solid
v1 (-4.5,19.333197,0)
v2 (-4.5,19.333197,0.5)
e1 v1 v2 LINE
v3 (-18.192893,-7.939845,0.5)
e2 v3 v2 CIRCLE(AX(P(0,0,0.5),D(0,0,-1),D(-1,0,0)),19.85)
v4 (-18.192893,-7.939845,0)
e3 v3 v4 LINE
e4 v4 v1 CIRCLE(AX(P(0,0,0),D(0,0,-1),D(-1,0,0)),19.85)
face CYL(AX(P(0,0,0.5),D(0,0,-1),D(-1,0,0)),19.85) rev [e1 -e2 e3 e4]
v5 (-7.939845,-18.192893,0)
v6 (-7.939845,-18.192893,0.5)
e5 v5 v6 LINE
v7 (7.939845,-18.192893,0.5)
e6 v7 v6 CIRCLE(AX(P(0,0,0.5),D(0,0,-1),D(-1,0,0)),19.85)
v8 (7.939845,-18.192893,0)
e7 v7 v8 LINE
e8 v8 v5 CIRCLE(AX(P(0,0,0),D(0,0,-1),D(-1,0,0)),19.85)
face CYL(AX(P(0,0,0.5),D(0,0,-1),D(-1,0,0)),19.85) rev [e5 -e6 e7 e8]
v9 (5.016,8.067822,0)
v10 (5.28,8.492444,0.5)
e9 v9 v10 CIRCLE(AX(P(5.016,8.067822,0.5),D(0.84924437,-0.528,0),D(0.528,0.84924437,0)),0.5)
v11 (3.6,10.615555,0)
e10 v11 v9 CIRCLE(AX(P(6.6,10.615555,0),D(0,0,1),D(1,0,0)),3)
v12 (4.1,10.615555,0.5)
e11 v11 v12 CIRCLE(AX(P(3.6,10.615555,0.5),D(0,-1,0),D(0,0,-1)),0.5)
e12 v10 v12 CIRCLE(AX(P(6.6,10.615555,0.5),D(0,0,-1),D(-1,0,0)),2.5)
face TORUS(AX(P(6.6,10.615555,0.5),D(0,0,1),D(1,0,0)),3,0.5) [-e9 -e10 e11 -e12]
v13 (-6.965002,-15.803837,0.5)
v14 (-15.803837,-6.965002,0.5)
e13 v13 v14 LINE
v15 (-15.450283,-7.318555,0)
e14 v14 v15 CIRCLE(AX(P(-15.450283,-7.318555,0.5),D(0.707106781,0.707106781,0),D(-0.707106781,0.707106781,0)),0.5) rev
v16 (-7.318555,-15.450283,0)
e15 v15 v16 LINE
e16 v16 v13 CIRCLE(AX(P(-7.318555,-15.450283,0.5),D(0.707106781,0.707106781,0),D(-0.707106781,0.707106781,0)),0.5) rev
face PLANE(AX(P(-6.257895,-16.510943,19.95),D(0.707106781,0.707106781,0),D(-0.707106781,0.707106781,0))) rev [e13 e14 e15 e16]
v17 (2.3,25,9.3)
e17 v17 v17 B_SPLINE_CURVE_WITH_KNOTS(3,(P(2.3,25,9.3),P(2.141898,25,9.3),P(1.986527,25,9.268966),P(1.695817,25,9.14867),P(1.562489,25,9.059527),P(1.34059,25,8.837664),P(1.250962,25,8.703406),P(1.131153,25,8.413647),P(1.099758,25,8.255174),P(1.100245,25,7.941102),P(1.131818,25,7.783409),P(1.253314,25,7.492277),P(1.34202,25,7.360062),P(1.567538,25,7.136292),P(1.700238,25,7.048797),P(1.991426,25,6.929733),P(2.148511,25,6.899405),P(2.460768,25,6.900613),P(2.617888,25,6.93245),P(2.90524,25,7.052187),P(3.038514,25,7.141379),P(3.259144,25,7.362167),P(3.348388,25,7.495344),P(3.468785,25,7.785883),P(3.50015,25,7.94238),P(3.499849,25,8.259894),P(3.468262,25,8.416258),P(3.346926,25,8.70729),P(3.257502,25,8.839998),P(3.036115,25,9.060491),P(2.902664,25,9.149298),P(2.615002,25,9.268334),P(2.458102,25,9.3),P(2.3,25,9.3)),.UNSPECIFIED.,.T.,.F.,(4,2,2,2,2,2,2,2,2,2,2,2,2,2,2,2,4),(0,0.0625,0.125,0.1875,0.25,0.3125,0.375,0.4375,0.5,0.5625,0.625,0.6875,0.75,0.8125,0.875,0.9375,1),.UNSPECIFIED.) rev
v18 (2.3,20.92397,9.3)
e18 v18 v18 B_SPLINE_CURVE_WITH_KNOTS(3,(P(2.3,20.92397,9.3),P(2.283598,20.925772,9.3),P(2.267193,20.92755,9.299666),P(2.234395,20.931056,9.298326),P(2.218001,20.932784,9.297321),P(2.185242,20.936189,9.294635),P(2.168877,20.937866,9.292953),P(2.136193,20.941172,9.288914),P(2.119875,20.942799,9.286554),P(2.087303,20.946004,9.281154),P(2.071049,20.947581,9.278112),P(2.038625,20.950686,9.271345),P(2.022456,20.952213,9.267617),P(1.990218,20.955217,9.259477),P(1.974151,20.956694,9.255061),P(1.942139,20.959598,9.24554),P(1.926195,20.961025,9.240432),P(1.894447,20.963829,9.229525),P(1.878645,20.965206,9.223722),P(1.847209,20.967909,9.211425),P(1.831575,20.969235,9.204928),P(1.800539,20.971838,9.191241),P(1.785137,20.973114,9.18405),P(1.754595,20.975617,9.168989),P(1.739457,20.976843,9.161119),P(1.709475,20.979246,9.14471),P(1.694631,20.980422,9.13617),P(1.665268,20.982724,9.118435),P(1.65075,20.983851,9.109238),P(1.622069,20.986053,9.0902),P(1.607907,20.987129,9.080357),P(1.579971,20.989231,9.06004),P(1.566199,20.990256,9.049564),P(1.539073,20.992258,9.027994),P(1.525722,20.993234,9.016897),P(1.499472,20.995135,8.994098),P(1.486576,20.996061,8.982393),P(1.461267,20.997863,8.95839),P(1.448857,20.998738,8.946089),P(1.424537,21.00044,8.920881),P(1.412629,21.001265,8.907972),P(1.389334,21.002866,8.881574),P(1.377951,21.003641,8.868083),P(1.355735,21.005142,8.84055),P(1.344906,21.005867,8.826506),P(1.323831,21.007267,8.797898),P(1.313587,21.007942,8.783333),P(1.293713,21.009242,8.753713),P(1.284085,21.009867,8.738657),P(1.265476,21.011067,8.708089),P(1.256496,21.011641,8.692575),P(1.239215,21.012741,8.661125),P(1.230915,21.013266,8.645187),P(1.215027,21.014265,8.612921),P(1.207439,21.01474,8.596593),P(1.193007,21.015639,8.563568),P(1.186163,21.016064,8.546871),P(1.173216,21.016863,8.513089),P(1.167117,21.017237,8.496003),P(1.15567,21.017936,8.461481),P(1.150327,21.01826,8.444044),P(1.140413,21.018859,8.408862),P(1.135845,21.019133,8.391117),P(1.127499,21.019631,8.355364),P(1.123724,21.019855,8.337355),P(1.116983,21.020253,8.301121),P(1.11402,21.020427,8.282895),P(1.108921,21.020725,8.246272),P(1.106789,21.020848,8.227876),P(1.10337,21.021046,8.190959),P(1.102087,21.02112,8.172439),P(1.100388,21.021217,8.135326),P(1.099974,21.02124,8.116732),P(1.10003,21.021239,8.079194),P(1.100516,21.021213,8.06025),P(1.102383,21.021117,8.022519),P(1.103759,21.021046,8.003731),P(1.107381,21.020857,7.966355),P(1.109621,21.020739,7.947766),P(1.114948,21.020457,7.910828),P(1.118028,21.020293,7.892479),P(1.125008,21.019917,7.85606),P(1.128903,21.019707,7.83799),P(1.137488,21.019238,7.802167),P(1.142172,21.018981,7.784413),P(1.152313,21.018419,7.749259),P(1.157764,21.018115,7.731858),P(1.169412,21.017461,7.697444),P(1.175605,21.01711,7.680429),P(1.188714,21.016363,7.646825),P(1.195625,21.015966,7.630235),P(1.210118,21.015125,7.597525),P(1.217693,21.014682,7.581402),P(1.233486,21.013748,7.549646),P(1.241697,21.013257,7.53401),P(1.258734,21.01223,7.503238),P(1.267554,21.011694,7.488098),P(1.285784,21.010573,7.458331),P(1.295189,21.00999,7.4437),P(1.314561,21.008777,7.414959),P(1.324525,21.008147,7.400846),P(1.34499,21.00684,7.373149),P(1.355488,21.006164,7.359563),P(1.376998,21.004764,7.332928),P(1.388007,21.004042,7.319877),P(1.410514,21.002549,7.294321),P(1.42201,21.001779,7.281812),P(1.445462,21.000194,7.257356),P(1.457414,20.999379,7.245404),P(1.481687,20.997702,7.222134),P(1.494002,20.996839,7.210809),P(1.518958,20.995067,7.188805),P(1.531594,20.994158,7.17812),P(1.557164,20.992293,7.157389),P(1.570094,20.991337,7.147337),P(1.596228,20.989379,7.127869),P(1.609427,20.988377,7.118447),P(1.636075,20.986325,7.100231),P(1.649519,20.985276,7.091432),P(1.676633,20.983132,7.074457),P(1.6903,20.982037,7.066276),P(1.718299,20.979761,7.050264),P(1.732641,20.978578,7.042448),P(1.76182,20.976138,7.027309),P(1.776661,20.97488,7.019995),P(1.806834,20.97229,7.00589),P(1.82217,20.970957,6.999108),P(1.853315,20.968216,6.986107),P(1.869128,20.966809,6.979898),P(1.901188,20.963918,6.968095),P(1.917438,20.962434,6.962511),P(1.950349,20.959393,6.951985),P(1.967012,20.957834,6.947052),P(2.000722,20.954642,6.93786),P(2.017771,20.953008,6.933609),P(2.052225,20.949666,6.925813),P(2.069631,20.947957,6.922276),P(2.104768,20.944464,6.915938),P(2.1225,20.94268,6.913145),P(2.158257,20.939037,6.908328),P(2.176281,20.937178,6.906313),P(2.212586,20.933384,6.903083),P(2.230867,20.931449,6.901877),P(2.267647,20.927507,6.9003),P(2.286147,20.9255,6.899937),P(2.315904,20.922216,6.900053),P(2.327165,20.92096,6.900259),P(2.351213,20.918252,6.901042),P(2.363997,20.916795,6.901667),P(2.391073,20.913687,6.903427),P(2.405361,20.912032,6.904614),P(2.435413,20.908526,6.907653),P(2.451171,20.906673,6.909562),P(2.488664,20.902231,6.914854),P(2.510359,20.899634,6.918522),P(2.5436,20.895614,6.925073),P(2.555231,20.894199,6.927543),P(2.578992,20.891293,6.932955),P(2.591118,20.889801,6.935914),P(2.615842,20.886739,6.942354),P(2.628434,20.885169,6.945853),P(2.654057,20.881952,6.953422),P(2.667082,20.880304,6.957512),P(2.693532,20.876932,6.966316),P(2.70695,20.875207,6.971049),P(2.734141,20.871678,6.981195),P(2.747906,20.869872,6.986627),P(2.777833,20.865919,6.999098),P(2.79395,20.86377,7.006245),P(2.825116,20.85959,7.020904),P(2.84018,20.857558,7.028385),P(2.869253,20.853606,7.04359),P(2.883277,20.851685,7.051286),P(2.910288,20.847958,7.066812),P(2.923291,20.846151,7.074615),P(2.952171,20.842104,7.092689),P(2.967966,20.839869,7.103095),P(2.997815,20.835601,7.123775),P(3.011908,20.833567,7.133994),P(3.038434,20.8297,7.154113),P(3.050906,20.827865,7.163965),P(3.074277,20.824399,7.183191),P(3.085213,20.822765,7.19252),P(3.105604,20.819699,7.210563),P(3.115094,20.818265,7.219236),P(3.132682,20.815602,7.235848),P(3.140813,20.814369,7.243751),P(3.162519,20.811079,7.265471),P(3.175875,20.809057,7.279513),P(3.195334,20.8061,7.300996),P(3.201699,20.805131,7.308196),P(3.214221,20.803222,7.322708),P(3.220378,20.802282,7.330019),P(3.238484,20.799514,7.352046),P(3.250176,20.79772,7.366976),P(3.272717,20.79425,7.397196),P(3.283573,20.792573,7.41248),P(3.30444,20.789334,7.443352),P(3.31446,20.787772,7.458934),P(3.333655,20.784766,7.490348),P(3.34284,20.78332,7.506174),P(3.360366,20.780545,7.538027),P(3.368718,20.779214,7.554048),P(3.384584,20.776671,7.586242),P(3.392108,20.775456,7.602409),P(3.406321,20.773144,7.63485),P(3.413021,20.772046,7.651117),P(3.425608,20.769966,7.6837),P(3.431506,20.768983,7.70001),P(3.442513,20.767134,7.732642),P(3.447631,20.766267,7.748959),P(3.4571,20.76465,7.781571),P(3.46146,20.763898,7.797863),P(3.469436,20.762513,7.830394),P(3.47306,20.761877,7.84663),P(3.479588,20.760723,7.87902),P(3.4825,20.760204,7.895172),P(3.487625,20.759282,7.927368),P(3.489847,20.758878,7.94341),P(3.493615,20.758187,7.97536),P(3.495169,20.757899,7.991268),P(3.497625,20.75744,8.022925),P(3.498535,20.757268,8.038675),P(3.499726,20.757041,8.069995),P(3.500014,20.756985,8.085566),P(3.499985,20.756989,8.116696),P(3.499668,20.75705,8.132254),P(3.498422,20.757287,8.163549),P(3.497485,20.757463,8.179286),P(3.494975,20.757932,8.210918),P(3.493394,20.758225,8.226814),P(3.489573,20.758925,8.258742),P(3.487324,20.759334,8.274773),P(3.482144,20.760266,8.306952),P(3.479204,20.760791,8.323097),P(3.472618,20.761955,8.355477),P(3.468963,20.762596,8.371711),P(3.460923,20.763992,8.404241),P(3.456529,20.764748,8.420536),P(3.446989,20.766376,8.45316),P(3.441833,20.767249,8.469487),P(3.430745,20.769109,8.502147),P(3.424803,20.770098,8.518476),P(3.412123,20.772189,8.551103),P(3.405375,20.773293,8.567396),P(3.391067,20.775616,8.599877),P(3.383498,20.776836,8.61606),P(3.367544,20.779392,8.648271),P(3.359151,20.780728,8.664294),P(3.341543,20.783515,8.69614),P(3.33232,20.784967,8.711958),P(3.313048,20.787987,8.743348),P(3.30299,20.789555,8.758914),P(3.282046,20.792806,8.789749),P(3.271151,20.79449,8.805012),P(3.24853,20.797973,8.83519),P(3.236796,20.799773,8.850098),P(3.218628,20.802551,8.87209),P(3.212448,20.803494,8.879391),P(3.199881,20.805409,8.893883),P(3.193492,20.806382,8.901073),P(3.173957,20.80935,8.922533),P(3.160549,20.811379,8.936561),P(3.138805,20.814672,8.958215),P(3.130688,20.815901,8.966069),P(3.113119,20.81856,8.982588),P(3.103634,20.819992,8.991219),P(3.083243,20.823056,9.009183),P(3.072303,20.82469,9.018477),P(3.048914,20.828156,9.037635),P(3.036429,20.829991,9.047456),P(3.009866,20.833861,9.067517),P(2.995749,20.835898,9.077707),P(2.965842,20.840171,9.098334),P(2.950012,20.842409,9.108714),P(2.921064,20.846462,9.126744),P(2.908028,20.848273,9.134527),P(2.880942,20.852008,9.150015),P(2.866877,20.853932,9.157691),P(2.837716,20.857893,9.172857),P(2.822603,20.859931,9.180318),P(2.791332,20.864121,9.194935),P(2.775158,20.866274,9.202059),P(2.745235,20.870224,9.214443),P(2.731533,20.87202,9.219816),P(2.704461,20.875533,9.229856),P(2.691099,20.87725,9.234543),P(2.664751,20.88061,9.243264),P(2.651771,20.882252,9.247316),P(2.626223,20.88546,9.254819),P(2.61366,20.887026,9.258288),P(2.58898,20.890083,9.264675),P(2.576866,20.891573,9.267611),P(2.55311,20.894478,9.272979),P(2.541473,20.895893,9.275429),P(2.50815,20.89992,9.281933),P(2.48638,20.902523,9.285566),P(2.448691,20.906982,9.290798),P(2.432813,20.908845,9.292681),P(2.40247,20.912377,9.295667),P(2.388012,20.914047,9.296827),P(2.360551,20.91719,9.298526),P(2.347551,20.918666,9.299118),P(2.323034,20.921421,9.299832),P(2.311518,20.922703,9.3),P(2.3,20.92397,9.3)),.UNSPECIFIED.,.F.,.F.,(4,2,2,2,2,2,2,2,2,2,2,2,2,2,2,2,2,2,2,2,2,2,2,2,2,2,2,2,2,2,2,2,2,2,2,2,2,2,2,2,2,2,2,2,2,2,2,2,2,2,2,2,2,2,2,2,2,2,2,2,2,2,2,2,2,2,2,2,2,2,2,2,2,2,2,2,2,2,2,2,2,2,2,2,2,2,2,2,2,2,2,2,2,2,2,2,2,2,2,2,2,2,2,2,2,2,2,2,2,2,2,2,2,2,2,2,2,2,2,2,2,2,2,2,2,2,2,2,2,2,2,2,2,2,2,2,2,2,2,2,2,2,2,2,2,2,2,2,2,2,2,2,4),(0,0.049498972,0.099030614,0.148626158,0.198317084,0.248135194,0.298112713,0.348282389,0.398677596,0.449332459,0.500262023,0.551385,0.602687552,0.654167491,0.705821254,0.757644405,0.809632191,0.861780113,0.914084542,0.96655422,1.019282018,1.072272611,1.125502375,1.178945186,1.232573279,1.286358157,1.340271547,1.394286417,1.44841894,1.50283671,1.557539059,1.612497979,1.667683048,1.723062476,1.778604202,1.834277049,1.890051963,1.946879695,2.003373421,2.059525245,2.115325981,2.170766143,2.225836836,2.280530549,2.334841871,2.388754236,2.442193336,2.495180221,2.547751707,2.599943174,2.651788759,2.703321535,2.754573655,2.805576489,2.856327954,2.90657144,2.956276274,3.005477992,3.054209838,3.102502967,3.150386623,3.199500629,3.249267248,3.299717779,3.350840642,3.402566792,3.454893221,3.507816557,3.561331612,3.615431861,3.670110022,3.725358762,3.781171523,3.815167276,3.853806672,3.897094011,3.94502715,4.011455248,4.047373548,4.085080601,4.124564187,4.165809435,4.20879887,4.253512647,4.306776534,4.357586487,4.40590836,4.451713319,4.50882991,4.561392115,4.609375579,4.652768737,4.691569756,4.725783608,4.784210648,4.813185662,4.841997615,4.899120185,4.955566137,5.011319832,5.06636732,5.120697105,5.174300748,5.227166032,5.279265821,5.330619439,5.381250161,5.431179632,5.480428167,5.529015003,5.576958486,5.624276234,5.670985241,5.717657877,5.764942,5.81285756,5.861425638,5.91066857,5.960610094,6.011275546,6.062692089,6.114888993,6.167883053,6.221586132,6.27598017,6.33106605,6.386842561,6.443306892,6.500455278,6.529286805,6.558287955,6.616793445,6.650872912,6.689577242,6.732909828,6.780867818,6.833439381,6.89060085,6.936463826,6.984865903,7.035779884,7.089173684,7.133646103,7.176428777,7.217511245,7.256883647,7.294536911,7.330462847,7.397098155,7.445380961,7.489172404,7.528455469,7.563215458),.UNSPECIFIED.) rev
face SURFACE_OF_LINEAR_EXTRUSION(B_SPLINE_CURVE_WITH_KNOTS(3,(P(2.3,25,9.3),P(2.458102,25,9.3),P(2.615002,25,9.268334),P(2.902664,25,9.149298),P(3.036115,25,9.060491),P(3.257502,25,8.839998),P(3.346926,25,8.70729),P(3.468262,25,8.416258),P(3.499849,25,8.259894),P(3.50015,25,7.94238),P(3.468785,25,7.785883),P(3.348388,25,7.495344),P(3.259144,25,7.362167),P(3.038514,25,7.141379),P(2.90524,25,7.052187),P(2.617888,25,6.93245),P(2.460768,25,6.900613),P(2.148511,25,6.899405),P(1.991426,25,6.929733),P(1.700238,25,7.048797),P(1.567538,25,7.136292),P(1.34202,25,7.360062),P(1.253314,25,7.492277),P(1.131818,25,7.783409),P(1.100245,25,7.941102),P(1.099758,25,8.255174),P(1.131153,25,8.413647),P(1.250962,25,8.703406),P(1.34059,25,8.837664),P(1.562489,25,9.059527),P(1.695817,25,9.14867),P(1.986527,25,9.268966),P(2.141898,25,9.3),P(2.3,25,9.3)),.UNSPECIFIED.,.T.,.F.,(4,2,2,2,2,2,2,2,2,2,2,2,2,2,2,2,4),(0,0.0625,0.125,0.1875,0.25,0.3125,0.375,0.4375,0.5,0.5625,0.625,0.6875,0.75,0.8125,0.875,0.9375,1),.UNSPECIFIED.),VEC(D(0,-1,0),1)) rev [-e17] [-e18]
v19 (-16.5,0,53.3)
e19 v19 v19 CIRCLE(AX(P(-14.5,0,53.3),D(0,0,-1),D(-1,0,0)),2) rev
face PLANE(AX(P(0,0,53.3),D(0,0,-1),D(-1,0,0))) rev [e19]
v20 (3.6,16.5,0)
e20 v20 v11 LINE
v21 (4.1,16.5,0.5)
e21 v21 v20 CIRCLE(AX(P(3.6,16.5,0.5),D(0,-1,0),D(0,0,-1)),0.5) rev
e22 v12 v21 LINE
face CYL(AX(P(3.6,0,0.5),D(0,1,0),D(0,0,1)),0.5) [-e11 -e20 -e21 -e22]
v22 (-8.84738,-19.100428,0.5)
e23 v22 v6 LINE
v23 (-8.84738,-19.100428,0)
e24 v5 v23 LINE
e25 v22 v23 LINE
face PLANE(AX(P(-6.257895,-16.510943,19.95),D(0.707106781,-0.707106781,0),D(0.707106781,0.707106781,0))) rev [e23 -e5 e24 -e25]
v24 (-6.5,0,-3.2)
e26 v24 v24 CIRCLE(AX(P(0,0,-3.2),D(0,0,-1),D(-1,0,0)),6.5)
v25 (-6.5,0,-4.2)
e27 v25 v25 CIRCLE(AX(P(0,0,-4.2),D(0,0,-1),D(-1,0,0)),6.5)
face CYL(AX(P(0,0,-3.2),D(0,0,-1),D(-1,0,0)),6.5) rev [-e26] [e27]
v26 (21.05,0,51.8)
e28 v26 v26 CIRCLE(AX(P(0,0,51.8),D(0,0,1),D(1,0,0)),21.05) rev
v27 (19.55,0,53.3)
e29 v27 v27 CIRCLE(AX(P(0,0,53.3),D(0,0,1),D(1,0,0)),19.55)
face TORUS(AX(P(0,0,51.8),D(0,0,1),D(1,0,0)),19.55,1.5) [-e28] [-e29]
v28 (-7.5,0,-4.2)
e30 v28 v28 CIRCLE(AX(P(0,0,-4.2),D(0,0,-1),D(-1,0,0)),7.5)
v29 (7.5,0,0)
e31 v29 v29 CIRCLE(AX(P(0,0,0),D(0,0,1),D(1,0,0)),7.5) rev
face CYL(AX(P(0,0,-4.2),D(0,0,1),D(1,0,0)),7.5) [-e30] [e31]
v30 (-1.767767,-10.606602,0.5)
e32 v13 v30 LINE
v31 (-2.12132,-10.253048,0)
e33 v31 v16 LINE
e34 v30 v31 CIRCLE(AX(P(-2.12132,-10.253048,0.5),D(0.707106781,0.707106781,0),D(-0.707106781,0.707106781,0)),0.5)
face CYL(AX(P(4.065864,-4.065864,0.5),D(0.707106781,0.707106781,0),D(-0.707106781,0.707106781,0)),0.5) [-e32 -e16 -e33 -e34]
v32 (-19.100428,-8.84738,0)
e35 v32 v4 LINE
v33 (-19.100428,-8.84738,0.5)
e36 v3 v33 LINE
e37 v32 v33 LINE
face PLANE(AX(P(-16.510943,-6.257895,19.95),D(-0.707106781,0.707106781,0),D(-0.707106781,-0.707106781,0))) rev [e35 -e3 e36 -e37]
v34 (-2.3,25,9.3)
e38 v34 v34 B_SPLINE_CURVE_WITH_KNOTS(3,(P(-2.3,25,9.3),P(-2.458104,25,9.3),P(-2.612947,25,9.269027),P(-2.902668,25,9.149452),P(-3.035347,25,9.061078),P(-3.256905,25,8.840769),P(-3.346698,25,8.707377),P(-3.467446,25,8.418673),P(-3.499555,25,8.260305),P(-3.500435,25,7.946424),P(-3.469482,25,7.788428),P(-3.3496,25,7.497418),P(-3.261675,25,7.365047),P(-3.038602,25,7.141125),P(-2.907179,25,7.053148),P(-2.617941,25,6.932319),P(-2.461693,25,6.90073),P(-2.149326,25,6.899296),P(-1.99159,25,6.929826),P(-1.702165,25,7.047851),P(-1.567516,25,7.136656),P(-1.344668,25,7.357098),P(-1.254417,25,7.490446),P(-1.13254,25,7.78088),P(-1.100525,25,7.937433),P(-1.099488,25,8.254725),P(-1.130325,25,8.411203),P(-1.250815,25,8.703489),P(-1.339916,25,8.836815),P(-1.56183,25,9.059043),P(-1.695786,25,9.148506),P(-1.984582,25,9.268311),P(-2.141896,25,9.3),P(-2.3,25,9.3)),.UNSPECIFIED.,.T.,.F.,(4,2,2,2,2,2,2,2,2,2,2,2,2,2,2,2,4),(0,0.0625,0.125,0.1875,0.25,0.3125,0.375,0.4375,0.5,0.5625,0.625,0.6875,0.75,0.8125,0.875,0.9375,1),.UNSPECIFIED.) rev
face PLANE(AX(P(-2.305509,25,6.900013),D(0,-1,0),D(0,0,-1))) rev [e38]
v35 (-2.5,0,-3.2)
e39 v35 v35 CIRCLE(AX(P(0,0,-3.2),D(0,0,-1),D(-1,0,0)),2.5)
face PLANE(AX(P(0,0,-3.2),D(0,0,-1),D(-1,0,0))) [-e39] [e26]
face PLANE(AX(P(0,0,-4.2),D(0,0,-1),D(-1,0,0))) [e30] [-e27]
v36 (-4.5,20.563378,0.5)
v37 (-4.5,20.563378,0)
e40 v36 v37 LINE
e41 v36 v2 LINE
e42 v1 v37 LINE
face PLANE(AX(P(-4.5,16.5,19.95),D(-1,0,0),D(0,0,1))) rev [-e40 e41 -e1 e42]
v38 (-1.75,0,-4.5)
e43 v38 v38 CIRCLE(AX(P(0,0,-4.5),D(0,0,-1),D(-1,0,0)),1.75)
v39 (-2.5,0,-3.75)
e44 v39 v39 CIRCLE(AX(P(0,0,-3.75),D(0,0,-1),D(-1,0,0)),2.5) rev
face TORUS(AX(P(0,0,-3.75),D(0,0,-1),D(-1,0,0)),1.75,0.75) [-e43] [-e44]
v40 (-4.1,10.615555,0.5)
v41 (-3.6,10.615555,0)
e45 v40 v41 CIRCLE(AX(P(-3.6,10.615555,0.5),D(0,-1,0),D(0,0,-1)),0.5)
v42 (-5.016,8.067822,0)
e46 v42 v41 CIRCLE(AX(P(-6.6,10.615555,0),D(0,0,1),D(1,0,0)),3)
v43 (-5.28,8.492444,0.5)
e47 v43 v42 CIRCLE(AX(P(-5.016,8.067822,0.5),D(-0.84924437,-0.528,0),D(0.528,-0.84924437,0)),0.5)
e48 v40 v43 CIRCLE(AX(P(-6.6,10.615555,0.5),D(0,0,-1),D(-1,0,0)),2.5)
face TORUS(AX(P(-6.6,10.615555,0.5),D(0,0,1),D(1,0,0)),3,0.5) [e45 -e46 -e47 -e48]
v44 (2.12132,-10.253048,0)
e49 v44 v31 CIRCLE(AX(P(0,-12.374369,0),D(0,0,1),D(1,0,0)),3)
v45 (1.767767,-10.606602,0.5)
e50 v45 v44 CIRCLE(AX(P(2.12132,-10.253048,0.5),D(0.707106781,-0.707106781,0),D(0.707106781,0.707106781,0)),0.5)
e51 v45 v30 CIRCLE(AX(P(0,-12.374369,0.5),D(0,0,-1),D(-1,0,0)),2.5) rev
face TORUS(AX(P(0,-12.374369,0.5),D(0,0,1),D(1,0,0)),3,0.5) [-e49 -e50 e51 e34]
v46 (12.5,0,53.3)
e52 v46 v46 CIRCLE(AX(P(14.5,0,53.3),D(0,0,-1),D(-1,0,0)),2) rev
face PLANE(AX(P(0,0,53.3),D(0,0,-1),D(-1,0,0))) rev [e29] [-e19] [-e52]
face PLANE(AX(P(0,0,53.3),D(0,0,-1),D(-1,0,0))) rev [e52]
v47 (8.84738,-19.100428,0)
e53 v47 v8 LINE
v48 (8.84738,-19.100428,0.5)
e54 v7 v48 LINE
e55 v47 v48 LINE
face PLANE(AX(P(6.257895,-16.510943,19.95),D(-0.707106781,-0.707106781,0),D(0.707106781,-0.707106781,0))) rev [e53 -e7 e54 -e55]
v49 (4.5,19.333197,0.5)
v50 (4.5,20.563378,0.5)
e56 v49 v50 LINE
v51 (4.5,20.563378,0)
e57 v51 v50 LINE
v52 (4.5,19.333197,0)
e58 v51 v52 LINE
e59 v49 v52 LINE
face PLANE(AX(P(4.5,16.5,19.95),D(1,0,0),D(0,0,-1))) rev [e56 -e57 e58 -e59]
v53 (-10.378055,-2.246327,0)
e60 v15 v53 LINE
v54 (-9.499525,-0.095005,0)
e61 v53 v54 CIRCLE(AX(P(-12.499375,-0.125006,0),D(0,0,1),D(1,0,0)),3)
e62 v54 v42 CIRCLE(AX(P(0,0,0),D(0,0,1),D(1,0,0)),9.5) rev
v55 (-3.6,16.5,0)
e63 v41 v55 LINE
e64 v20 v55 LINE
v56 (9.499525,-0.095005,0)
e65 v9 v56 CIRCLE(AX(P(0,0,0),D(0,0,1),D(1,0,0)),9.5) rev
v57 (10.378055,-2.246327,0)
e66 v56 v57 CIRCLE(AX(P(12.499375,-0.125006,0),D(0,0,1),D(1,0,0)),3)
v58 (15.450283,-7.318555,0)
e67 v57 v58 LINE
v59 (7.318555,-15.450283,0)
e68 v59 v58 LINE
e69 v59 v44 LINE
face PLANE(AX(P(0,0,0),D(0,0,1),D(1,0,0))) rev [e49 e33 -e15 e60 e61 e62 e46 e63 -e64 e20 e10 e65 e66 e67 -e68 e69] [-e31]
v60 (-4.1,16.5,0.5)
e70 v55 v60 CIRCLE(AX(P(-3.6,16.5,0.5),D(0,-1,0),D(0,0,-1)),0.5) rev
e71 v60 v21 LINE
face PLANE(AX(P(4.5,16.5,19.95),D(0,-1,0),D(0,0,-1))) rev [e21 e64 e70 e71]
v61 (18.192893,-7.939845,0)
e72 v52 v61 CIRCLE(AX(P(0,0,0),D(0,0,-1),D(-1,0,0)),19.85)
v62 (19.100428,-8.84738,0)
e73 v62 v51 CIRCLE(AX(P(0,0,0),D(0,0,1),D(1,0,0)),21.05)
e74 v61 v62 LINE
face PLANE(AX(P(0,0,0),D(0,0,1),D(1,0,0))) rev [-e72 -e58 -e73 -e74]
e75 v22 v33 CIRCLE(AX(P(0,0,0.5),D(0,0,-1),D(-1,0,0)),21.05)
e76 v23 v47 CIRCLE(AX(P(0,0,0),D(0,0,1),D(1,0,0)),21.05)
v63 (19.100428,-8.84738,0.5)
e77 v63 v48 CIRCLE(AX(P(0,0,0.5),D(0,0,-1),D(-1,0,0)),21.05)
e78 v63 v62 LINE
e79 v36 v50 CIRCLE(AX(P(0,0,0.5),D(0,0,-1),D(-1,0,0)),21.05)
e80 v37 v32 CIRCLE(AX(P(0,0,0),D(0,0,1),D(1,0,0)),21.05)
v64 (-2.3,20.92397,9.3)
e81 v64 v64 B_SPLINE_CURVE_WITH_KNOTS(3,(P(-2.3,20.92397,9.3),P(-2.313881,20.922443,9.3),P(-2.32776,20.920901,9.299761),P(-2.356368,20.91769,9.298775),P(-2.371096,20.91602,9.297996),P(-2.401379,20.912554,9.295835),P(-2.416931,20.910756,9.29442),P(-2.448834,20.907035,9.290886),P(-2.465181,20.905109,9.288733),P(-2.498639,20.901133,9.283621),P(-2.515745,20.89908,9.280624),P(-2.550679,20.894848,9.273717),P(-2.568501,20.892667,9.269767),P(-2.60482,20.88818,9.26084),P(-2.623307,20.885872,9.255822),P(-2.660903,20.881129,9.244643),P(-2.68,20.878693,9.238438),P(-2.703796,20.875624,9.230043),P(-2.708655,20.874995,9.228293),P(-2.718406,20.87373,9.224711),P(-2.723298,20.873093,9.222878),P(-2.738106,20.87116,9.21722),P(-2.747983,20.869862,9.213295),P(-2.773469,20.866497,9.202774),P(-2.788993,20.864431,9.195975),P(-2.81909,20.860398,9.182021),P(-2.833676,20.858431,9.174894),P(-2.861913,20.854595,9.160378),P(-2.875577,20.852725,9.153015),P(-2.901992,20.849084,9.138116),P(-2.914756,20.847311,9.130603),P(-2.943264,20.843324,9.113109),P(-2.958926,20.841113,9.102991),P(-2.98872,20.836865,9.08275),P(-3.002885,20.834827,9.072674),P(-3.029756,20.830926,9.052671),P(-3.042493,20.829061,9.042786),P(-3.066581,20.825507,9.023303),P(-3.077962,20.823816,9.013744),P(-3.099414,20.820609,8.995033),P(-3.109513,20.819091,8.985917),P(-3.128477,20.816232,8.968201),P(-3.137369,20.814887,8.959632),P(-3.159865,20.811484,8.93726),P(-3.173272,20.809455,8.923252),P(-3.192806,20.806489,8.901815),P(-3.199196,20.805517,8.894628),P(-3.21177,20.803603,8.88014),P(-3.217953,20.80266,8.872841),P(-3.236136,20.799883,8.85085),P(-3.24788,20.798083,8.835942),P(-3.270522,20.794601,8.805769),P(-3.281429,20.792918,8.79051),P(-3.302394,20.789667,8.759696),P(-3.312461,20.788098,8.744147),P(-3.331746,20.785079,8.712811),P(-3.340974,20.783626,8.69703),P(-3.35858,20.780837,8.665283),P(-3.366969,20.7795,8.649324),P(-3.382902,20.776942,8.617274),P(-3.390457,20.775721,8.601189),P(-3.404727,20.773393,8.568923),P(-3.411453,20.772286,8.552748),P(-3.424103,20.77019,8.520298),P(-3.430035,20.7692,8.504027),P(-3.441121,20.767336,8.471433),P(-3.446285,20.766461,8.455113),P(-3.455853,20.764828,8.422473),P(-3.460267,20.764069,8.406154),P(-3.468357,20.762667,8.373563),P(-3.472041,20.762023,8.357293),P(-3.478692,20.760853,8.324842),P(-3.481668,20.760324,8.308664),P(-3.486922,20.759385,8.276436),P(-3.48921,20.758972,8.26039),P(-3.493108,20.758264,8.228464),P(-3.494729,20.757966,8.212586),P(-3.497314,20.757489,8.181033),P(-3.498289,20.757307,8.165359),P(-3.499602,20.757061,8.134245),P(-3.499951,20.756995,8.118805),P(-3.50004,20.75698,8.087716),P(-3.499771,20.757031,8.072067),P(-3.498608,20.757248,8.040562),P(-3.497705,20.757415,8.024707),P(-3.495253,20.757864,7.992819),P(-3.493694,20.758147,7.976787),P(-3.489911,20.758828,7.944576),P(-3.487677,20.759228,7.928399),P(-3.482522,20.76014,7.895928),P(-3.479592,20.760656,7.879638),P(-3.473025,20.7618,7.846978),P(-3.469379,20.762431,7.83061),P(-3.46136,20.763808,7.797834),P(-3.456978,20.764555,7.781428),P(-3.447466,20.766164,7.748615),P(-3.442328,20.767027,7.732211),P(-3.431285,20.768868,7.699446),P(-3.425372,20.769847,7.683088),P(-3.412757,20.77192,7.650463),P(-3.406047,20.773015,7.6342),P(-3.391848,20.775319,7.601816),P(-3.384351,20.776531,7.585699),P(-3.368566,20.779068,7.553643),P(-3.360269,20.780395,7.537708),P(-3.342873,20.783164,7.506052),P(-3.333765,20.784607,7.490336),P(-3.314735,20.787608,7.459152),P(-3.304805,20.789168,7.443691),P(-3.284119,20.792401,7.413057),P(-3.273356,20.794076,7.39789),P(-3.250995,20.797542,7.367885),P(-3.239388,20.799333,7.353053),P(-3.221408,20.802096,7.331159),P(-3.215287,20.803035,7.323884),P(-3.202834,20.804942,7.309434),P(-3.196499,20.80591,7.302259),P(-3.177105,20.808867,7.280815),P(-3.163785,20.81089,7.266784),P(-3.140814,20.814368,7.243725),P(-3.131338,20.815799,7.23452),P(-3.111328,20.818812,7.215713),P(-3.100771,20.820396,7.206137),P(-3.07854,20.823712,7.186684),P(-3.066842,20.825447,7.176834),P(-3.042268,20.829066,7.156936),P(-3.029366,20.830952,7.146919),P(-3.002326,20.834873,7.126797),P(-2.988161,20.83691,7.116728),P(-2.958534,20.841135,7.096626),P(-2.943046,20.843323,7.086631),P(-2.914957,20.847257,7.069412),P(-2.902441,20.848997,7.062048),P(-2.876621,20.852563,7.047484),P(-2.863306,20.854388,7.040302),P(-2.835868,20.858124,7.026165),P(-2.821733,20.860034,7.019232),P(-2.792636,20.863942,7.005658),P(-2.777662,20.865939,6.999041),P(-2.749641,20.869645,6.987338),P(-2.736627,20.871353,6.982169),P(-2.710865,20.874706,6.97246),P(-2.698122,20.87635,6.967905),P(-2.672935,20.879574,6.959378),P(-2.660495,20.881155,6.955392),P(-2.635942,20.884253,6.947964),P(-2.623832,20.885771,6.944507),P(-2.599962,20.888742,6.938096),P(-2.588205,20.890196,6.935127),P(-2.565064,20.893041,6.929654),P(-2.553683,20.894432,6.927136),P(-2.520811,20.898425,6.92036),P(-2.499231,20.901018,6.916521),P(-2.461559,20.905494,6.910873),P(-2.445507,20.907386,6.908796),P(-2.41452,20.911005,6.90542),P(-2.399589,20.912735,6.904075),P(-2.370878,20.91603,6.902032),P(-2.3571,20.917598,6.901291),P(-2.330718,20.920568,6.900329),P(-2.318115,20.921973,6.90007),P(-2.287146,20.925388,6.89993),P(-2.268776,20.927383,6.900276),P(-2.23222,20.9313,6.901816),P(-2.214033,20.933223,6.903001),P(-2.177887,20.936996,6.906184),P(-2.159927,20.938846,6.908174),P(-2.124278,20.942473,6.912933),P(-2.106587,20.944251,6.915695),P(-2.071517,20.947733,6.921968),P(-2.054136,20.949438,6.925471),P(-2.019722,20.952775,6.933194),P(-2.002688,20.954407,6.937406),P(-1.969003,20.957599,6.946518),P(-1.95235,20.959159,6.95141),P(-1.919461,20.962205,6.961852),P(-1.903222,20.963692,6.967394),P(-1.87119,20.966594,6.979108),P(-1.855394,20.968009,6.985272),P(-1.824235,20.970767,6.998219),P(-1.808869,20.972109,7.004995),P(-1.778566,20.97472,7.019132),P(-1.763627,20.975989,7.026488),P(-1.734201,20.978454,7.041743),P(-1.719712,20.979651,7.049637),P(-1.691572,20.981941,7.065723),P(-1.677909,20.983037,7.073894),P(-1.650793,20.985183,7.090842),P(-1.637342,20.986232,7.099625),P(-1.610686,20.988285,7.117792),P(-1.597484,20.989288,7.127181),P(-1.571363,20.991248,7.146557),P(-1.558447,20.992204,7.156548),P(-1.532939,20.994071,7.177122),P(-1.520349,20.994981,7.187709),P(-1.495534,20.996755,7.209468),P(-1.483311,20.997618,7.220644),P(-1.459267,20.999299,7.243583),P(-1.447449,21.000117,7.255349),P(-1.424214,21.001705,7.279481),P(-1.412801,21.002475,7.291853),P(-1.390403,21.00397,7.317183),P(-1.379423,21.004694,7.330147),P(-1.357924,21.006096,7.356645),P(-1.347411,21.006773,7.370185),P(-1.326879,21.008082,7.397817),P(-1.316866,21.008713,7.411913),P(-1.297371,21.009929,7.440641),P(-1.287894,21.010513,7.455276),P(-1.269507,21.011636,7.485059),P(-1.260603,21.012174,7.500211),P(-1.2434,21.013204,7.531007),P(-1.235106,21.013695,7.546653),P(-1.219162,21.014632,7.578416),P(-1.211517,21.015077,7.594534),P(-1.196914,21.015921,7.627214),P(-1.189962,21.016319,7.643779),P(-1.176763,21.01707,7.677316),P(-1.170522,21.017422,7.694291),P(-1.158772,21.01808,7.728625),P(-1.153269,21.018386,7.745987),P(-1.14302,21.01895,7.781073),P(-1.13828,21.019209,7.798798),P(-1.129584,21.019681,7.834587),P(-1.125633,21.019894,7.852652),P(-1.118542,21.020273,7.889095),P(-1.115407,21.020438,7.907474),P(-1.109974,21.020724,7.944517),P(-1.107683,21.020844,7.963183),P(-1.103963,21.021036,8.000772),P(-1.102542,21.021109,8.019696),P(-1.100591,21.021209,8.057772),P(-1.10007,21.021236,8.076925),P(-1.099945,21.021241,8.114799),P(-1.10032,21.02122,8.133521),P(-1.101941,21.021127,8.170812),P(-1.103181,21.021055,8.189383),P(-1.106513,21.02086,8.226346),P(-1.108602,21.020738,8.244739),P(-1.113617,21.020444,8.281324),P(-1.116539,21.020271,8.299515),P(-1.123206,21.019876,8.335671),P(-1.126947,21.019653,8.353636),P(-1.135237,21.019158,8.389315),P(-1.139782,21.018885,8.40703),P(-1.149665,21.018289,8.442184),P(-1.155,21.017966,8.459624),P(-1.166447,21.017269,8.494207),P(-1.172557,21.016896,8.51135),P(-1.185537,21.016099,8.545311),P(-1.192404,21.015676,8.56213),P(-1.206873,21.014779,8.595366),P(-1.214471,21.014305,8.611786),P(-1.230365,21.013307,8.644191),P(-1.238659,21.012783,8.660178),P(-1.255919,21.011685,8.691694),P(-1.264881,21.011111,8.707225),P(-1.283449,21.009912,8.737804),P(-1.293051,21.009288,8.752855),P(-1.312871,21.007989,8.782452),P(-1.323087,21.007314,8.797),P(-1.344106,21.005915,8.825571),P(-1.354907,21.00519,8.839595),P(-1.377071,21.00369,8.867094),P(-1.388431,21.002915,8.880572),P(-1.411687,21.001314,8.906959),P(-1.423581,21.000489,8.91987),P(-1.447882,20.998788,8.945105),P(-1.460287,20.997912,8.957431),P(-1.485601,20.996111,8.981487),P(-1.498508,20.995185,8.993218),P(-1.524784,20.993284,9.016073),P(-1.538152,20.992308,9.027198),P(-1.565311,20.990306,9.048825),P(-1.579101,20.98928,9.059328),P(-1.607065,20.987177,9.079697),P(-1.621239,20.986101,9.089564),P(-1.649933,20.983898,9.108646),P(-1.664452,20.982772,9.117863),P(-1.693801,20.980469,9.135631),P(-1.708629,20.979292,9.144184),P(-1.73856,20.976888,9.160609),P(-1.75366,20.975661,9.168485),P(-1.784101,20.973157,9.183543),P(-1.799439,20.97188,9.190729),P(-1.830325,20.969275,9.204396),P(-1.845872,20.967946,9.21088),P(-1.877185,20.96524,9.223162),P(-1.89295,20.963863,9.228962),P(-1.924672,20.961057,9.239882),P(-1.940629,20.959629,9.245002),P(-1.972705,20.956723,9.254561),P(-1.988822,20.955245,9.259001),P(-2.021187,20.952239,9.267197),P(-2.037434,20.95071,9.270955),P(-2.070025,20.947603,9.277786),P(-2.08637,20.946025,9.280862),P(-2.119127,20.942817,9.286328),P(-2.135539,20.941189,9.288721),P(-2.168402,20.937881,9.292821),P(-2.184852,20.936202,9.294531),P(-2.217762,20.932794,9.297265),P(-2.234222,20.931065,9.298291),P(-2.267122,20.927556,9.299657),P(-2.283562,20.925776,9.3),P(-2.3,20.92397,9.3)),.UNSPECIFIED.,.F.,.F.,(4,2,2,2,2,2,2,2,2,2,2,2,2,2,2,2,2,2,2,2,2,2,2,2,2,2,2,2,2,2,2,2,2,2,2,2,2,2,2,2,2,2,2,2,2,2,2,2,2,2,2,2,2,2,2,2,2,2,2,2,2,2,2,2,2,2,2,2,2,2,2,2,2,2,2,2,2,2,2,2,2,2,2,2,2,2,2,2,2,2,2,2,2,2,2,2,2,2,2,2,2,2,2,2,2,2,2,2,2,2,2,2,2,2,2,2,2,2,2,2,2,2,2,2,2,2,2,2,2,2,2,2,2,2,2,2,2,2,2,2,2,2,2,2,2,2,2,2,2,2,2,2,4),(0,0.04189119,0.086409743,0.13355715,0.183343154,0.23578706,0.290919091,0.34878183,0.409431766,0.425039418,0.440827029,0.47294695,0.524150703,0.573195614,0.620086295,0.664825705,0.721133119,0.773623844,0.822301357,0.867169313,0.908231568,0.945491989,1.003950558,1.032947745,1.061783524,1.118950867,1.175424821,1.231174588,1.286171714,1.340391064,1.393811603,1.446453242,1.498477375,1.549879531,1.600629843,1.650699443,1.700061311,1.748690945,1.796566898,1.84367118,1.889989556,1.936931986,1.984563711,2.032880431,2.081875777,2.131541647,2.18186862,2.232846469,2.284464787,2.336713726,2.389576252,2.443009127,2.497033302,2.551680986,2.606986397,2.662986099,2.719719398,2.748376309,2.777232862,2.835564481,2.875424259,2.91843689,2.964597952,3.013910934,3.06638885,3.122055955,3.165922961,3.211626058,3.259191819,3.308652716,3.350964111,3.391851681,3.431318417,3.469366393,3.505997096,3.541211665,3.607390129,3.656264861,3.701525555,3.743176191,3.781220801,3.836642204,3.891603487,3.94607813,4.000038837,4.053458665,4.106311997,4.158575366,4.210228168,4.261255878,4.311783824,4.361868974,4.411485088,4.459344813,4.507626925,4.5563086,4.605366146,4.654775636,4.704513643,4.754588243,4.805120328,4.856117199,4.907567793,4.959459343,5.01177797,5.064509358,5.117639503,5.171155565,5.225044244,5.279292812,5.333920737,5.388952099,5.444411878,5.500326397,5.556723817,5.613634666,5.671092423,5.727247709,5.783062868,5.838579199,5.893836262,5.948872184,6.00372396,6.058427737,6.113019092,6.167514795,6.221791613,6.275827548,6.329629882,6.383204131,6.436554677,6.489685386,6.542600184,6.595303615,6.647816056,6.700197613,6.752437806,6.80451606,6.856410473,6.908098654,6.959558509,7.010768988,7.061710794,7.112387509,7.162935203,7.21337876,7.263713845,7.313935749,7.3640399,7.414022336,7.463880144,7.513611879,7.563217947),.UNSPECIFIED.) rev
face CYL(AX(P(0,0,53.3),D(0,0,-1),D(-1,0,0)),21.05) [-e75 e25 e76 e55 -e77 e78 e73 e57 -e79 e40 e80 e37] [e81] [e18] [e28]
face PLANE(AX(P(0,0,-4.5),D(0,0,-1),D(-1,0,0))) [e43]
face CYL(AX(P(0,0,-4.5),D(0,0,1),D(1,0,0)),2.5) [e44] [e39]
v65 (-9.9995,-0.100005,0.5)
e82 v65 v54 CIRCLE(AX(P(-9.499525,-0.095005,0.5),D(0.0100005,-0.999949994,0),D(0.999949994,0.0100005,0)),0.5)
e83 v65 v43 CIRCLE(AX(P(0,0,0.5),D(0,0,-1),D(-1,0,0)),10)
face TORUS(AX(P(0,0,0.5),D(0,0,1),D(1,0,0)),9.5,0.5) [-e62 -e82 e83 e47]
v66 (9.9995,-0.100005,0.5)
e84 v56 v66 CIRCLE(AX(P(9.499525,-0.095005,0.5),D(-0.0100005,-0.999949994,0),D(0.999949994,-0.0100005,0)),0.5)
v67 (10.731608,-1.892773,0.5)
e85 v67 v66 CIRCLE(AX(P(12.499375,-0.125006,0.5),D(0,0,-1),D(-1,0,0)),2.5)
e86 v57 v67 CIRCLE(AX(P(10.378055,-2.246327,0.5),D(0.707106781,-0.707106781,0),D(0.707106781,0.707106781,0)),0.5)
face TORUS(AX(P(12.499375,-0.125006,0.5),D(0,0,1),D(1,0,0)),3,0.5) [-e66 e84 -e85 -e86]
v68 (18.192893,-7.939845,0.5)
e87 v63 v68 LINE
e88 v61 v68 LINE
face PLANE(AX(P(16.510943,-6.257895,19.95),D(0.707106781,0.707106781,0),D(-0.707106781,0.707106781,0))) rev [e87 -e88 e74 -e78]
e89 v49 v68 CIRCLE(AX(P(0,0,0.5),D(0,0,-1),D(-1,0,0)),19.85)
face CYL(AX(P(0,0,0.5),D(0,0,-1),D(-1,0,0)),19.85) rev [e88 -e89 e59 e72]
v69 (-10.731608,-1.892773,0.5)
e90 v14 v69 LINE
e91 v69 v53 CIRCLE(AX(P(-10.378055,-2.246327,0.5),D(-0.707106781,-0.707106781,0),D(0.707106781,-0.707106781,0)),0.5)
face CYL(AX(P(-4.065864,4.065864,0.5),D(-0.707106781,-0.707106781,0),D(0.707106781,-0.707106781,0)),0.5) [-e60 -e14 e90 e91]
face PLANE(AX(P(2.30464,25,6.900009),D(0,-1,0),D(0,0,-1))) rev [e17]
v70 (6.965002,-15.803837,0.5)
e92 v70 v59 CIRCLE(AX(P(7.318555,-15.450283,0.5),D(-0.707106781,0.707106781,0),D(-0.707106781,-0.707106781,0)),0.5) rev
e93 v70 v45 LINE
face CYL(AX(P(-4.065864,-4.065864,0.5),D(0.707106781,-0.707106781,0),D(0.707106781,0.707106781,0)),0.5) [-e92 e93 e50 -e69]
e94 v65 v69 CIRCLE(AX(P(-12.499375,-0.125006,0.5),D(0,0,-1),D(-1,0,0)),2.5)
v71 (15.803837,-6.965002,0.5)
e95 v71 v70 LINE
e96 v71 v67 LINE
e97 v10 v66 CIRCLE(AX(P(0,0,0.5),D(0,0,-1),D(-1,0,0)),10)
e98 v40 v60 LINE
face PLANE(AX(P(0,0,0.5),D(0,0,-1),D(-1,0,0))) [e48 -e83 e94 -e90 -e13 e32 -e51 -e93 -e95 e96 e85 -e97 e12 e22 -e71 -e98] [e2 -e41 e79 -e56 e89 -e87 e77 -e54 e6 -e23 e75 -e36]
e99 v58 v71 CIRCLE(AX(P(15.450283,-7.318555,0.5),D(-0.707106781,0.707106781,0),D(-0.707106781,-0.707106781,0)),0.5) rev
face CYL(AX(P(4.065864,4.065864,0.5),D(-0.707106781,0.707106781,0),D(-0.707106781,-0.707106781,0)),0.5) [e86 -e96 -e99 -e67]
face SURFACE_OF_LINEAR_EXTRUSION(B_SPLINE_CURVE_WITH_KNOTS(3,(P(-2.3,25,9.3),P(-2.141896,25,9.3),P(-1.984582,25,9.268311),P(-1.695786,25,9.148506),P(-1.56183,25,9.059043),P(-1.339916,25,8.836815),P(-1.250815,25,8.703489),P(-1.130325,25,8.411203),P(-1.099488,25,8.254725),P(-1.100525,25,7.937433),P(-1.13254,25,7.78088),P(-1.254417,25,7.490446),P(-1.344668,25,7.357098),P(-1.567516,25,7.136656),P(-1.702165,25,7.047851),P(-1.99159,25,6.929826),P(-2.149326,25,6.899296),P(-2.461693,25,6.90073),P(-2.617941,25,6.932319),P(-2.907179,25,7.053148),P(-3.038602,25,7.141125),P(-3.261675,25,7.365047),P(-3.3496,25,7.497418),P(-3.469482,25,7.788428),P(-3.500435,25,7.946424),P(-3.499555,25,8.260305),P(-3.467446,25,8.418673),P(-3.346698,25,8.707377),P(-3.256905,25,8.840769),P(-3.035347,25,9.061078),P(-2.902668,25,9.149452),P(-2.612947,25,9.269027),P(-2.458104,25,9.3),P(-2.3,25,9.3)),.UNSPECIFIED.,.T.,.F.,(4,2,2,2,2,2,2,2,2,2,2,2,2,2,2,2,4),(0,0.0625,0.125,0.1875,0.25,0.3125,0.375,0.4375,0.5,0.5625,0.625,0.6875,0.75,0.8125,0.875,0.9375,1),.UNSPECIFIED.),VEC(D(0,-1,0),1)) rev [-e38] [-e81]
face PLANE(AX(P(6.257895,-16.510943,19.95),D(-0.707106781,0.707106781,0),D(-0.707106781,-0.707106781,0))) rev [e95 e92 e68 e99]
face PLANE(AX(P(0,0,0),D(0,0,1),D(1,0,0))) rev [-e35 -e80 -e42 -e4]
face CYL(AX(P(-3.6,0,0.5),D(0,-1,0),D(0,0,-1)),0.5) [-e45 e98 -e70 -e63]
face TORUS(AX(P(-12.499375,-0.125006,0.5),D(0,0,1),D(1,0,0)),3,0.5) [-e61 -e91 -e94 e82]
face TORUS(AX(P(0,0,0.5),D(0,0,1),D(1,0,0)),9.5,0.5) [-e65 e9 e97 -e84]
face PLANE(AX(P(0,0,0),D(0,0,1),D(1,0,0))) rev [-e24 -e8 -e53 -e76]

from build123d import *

# Parameters (mm, degrees)
SKETCH_1_R          = 21.05
EXTRUDE_1_DEPTH     = 53.3
FILLET_1_R          = 1.5
CUT_EXTRUDE_1_DEPTH = 0.5
SKETCH_3_R          = 7.5
EXTRUDE_2_DEPTH     = 4.2
SKETCH_4_R          = 6.5
CUT_EXTRUDE_2_DEPTH = 1
SKETCH_5_R          = 2.5
EXTRUDE_3_DEPTH     = 1.3
FILLET_2_R          = 0.75
FILLET_3_R          = 2.5
FILLET_4_R          = 0.5
SKETCH_7_W          = 9
SKETCH_7_H          = 4.55
CUT_EXTRUDE_3_DEPTH = 0.5
SKETCH_9_R          = 21
EXTRUDE_4_DEPTH     = 39.2
EXTRUDE_5_DEPTH     = 2
SKETCH_11_R         = 8
EXTRUDE_6_DEPTH     = 0.5
SKETCH_12_R         = 7.1
EXTRUDE_7_DEPTH     = 1
SKETCH_13_R         = 4
EXTRUDE_8_DEPTH     = 20
SKETCH_14_W         = 8
SKETCH_14_H         = 12
CUT_EXTRUDE_4_DEPTH = 1
SKETCH_15_R         = 2
CUT_EXTRUDE_5_DEPTH = 6
CHAMFER_1_SIZE      = 0.5
EXTRUDE_9_DEPTH     = 25
CHAMFER_2_SIZE      = 0.2
OTHER_START         = 53.3
OTHER_1_OUTLINE_R   = 21
OTHER_1_DEPTH       = 61.2


# Read off the part's stored shape, not the designer's step: 交差1
with BuildPart() as part:
    # ｽｹｯﾁ1 → ﾎﾞｽ - 押し出し1 (new body)
    with BuildSketch(Plane.XY):
        Circle(SKETCH_1_R)
    extrude(amount=EXTRUDE_1_DEPTH)

    # ﾌｨﾚｯﾄ1
    fillet_1_edges = [part.edges().sort_by_distance(p)[0] for p in [
        (-21.05, 0, 53.3),
    ]]
    fillet(fillet_1_edges, radius=FILLET_1_R)

    # ｽｹｯﾁ2 → ｶｯﾄ - 押し出し1 (cut)
    with BuildSketch(Plane(origin=(0, 0, 0), x_dir=(-1, 0, 0), z_dir=(0, 0, -1))):
        with BuildLine():
            Line((-1.767766953, -10.606601718), (-8.902744604, -17.741579369))
            ThreePointArc((-8.902744604, -17.741579369), (0, -19.85), (8.902744604, -17.741579369))
            Line((8.902744604, -17.741579369), (1.767766953, -10.606601718))
            ThreePointArc((1.767766953, -10.606601718), (0, -9.874368671), (-1.767766953, -10.606601718))
        make_face()
        with BuildLine():
            Line((-17.741579369, -8.902744604), (-9.939267924, -1.100433159))
            ThreePointArc((-9.939267924, -1.100433159), (-8.682968675, 4.960449072), (-4.1, 9.120855223))
            Line((-4.1, 9.120855223), (-4.1, 19.421959221))
            ThreePointArc((-4.1, 19.421959221), (-17.883955352, 8.613166721), (-17.741579369, -8.902744604))
        make_face()
        with BuildLine():
            Line((4.1, 19.421959221), (4.1, 9.120855223))
            ThreePointArc((4.1, 9.120855223), (8.682968675, 4.960449072), (9.939267924, -1.100433159))
            Line((9.939267924, -1.100433159), (17.741579369, -8.902744604))
            ThreePointArc((17.741579369, -8.902744604), (17.883955352, 8.613166721), (4.1, 19.421959221))
        make_face()
    extrude(amount=-CUT_EXTRUDE_1_DEPTH, mode=Mode.SUBTRACT)

    # ｽｹｯﾁ3 → ﾎﾞｽ - 押し出し2 (add)
    with BuildSketch(Plane(origin=(0, 0, 0), x_dir=(-1, 0, 0), z_dir=(0, 0, -1))):
        with Locations(Location((0, 0, 0), (0, 0, 180))):
            Circle(SKETCH_3_R)
    extrude(amount=EXTRUDE_2_DEPTH)

    # ｽｹｯﾁ4 → ｶｯﾄ - 押し出し2 (cut)
    with BuildSketch(Plane(origin=(0, 0, -4.2), x_dir=(-1, 0, 0), z_dir=(0, 0, -1))):
        Circle(SKETCH_4_R)
    extrude(amount=-CUT_EXTRUDE_2_DEPTH, mode=Mode.SUBTRACT)

    # ｽｹｯﾁ5 → ﾎﾞｽ - 押し出し3 (add)
    with BuildSketch(Plane(origin=(0, 0, -3.2), x_dir=(-1, 0, 0), z_dir=(0, 0, -1))):
        Circle(SKETCH_5_R)
    extrude(amount=EXTRUDE_3_DEPTH)

    # ﾌｨﾚｯﾄ2
    fillet_2_edges = [part.edges().sort_by_distance(p)[0] for p in [
        (2.5, 0, -4.5),
    ]]
    fillet(fillet_2_edges, radius=FILLET_2_R)

    # ﾌｨﾚｯﾄ3
    fillet_3_edges = [part.edges().sort_by_distance(p)[0] for p in [
        (-9.939267924, -1.100433159, 0.25),
        (-4.1, 9.120855223, 0.25),
        (4.1, 9.120855223, 0.25),
        (9.939267924, -1.100433159, 0.25),
    ]]
    fillet(fillet_3_edges, radius=FILLET_3_R)

    # ﾌｨﾚｯﾄ4
    fillet_4_edges = [part.edges().sort_by_distance(p)[0] for p in [
        (5.335255779, -14.174090543, 0),
        (-5.335255779, -14.174090543, 0),
        (-14.236593669, -5.397758904, 0),
        (-10.184921124, -1.070153656, 0),
        (-8.764891514, 4.814216109, 0),
        (-4.414822662, 9.401058845, 0),
        (14.236593669, -5.397758904, 0),
        (10.184921124, -1.070153656, 0),
        (8.764891514, 4.814216109, 0),
        (4.414822662, 9.401058845, 0),
        (0, -9.874368671, 0),
        (-4.1, 15.018756923, 0),
        (4.1, 15.018756923, 0),
    ]]
    fillet(fillet_4_edges, radius=FILLET_4_R - 0.0001)  # a hair under: the kernel refuses the full size

    # ｽｹｯﾁ7 → ｶｯﾄ - 押し出し3 (cut)
    with BuildSketch(Plane(origin=(0, 0, 0), x_dir=(-1, 0, 0), z_dir=(0, 0, -1))):
        with Locations((0, 18.775)):
            Rectangle(SKETCH_7_W, SKETCH_7_H)
        Polygon((-6.257895014, -16.510943341), (-9.75807358, -20.011121908), (-20.011121908, -9.75807358), (-16.510943341, -6.257895014), align=None)
        Polygon((6.257895014, -16.510943341), (16.510943341, -6.257895014), (20.011121908, -9.75807358), (9.75807358, -20.011121908), align=None)
    extrude(amount=-CUT_EXTRUDE_3_DEPTH, mode=Mode.SUBTRACT)

    # ｽｹｯﾁ9 → ﾎﾞｽ - 押し出し4 (add)
    with BuildSketch(Plane.XY.offset(53.3)):
        Circle(SKETCH_9_R)
    extrude(amount=EXTRUDE_4_DEPTH)

    # ｽｹｯﾁ10 → ﾎﾞｽ - 押し出し5 (add)
    with BuildSketch(Plane.XY.offset(92.5)):
        with BuildLine():
            Line((4.667626369, 11.595829599), (11.595829599, 4.667626369))
            ThreePointArc((11.595829599, 4.667626369), (8.838834765, -8.838834765), (-4.667626369, -11.595829599))
            Line((-4.667626369, -11.595829599), (-11.595829599, -4.667626369))
            ThreePointArc((-11.595829599, -4.667626369), (-8.838834765, 8.838834765), (4.667626369, 11.595829599))
        make_face()
    extrude(amount=EXTRUDE_5_DEPTH)

    # ｽｹｯﾁ11 → ﾎﾞｽ - 押し出し6 (add)
    with BuildSketch(Plane.XY.offset(94.5)):
        Circle(SKETCH_11_R)
    extrude(amount=EXTRUDE_6_DEPTH)

    # ｽｹｯﾁ12 → ﾎﾞｽ - 押し出し7 (add)
    with BuildSketch(Plane.XY.offset(95)):
        Circle(SKETCH_12_R)
    extrude(amount=EXTRUDE_7_DEPTH)

    # ｽｹｯﾁ13 → ﾎﾞｽ - 押し出し8 (add)
    with BuildSketch(Plane.XY.offset(94.5)):
        Circle(SKETCH_13_R)
    extrude(amount=EXTRUDE_8_DEPTH)

    # ｽｹｯﾁ14 → ｶｯﾄ - 押し出し4 (cut)
    with BuildSketch(Plane(origin=(0, 4, 0), x_dir=(1, 0, 0), z_dir=(0, 1, 0))):
        with Locations((0, -108.5)):
            Rectangle(SKETCH_14_W, SKETCH_14_H)
    extrude(amount=-CUT_EXTRUDE_4_DEPTH, mode=Mode.SUBTRACT)

    # ｽｹｯﾁ15 → ｶｯﾄ - 押し出し5 (cut)
    with BuildSketch(Plane.XY.offset(92.5)):
        with Locations((0, 17.5)):
            Circle(SKETCH_15_R)
        with Locations((17.5, 0)):
            Circle(SKETCH_15_R)
        with Locations((0, -17.5)):
            Circle(SKETCH_15_R)
        with Locations((-17.5, 0)):
            Circle(SKETCH_15_R)
    extrude(amount=-CUT_EXTRUDE_5_DEPTH, mode=Mode.SUBTRACT)

    # 面取り1
    chamfer_1_edges = [part.edges().sort_by_distance(p)[0] for p in [
        (-21, 0, 53.3),
        (-21, 0, 92.5),
    ]]
    chamfer(chamfer_1_edges, length=CHAMFER_1_SIZE)

    # ｽｹｯﾁ19 → ﾎﾞｽ - 押し出し9 (add)
    with BuildSketch(Plane(origin=(0, 0, 0), x_dir=(1, 0, 0), z_dir=(0, 1, 0))):
        with BuildLine():
            add(Edge.make_bspline(
                [(-2.3, -9.3), (-2.141895722, -9.3), (-1.984582336, -9.26831111), (-1.695786007, -9.148505891), (-1.561830045, -9.059042657), (-1.339916148, -8.83681524), (-1.250815241, -8.703488676), (-1.130324814, -8.411202826), (-1.099488051, -8.254725269), (-1.100524759, -7.937433107), (-1.132539642, -7.780879651), (-1.254416503, -7.490445543), (-1.344667636, -7.357097524), (-1.567516387, -7.136655943), (-1.702165246, -7.047850886), (-1.991590037, -6.92982589), (-2.149326122, -6.899295567), (-2.461692814, -6.900729728), (-2.617940839, -6.932319306), (-2.907178904, -7.053148359), (-3.038602416, -7.141124571), (-3.26167511, -7.365046532), (-3.349599592, -7.497417785), (-3.469481665, -7.788427754), (-3.500435327, -7.946423907), (-3.499555239, -8.260305399), (-3.467445926, -8.418673048), (-3.34669763, -8.707376797), (-3.256905259, -8.840768765), (-3.035347061, -9.061077904), (-2.902667973, -9.149452405), (-2.612947139, -9.269026571), (-2.458104278, -9.3), (-2.3, -9.3)],
                knots=[0, 0, 0, 0, 0.0625, 0.0625, 0.125, 0.125, 0.1875, 0.1875, 0.25, 0.25, 0.3125, 0.3125, 0.375, 0.375, 0.4375, 0.4375, 0.5, 0.5, 0.5625, 0.5625, 0.625, 0.625, 0.6875, 0.6875, 0.75, 0.75, 0.8125, 0.8125, 0.875, 0.875, 0.9375, 0.9375, 1, 1, 1, 1], degree=3))
        make_face()
        with BuildLine():
            add(Edge.make_bspline(
                [(2.3, -9.3), (2.458101824, -9.3), (2.615002003, -9.268333612), (2.902663727, -9.149297919), (3.036114818, -9.060490649), (3.257502016, -8.83999811), (3.346925979, -8.707290324), (3.468262095, -8.416258156), (3.499849023, -8.259893759), (3.500149899, -7.94238048), (3.468784785, -7.78588338), (3.348388342, -7.495343893), (3.259144479, -7.362166602), (3.038513671, -7.141379213), (2.905239906, -7.052187197), (2.617888296, -6.932449554), (2.460768356, -6.900612609), (2.148510682, -6.899405329), (1.991426227, -6.92973338), (1.700237772, -7.048797353), (1.567538038, -7.136292434), (1.342020343, -7.360062317), (1.253313742, -7.492276634), (1.131817712, -7.783408851), (1.100245068, -7.941102293), (1.09975782, -8.255174381), (1.131152757, -8.41364744), (1.250962434, -8.703405981), (1.340590257, -8.837664202), (1.562488668, -9.059527262), (1.695817167, -9.148670082), (1.986527204, -9.268965629), (2.141898176, -9.3), (2.3, -9.3)],
                knots=[0, 0, 0, 0, 0.0625, 0.0625, 0.125, 0.125, 0.1875, 0.1875, 0.25, 0.25, 0.3125, 0.3125, 0.375, 0.375, 0.4375, 0.4375, 0.5, 0.5, 0.5625, 0.5625, 0.625, 0.625, 0.6875, 0.6875, 0.75, 0.75, 0.8125, 0.8125, 0.875, 0.875, 0.9375, 0.9375, 1, 1, 1, 1], degree=3))
        make_face()
    extrude(amount=EXTRUDE_9_DEPTH)

    # 面取り2
    chamfer_2_edges = [part.edges().sort_by_distance(p)[0] for p in [
        (-1.645751311, -3.645751311, 114.5),
    ]]
    chamfer(chamfer_2_edges, length=CHAMFER_2_SIZE)

    # 交差1 outline → 交差1 (cut)
    with BuildSketch(Plane.XY.offset(OTHER_START)):
        Circle(OTHER_1_OUTLINE_R)
    extrude(amount=OTHER_1_DEPTH, mode=Mode.SUBTRACT)


solid = part.part
